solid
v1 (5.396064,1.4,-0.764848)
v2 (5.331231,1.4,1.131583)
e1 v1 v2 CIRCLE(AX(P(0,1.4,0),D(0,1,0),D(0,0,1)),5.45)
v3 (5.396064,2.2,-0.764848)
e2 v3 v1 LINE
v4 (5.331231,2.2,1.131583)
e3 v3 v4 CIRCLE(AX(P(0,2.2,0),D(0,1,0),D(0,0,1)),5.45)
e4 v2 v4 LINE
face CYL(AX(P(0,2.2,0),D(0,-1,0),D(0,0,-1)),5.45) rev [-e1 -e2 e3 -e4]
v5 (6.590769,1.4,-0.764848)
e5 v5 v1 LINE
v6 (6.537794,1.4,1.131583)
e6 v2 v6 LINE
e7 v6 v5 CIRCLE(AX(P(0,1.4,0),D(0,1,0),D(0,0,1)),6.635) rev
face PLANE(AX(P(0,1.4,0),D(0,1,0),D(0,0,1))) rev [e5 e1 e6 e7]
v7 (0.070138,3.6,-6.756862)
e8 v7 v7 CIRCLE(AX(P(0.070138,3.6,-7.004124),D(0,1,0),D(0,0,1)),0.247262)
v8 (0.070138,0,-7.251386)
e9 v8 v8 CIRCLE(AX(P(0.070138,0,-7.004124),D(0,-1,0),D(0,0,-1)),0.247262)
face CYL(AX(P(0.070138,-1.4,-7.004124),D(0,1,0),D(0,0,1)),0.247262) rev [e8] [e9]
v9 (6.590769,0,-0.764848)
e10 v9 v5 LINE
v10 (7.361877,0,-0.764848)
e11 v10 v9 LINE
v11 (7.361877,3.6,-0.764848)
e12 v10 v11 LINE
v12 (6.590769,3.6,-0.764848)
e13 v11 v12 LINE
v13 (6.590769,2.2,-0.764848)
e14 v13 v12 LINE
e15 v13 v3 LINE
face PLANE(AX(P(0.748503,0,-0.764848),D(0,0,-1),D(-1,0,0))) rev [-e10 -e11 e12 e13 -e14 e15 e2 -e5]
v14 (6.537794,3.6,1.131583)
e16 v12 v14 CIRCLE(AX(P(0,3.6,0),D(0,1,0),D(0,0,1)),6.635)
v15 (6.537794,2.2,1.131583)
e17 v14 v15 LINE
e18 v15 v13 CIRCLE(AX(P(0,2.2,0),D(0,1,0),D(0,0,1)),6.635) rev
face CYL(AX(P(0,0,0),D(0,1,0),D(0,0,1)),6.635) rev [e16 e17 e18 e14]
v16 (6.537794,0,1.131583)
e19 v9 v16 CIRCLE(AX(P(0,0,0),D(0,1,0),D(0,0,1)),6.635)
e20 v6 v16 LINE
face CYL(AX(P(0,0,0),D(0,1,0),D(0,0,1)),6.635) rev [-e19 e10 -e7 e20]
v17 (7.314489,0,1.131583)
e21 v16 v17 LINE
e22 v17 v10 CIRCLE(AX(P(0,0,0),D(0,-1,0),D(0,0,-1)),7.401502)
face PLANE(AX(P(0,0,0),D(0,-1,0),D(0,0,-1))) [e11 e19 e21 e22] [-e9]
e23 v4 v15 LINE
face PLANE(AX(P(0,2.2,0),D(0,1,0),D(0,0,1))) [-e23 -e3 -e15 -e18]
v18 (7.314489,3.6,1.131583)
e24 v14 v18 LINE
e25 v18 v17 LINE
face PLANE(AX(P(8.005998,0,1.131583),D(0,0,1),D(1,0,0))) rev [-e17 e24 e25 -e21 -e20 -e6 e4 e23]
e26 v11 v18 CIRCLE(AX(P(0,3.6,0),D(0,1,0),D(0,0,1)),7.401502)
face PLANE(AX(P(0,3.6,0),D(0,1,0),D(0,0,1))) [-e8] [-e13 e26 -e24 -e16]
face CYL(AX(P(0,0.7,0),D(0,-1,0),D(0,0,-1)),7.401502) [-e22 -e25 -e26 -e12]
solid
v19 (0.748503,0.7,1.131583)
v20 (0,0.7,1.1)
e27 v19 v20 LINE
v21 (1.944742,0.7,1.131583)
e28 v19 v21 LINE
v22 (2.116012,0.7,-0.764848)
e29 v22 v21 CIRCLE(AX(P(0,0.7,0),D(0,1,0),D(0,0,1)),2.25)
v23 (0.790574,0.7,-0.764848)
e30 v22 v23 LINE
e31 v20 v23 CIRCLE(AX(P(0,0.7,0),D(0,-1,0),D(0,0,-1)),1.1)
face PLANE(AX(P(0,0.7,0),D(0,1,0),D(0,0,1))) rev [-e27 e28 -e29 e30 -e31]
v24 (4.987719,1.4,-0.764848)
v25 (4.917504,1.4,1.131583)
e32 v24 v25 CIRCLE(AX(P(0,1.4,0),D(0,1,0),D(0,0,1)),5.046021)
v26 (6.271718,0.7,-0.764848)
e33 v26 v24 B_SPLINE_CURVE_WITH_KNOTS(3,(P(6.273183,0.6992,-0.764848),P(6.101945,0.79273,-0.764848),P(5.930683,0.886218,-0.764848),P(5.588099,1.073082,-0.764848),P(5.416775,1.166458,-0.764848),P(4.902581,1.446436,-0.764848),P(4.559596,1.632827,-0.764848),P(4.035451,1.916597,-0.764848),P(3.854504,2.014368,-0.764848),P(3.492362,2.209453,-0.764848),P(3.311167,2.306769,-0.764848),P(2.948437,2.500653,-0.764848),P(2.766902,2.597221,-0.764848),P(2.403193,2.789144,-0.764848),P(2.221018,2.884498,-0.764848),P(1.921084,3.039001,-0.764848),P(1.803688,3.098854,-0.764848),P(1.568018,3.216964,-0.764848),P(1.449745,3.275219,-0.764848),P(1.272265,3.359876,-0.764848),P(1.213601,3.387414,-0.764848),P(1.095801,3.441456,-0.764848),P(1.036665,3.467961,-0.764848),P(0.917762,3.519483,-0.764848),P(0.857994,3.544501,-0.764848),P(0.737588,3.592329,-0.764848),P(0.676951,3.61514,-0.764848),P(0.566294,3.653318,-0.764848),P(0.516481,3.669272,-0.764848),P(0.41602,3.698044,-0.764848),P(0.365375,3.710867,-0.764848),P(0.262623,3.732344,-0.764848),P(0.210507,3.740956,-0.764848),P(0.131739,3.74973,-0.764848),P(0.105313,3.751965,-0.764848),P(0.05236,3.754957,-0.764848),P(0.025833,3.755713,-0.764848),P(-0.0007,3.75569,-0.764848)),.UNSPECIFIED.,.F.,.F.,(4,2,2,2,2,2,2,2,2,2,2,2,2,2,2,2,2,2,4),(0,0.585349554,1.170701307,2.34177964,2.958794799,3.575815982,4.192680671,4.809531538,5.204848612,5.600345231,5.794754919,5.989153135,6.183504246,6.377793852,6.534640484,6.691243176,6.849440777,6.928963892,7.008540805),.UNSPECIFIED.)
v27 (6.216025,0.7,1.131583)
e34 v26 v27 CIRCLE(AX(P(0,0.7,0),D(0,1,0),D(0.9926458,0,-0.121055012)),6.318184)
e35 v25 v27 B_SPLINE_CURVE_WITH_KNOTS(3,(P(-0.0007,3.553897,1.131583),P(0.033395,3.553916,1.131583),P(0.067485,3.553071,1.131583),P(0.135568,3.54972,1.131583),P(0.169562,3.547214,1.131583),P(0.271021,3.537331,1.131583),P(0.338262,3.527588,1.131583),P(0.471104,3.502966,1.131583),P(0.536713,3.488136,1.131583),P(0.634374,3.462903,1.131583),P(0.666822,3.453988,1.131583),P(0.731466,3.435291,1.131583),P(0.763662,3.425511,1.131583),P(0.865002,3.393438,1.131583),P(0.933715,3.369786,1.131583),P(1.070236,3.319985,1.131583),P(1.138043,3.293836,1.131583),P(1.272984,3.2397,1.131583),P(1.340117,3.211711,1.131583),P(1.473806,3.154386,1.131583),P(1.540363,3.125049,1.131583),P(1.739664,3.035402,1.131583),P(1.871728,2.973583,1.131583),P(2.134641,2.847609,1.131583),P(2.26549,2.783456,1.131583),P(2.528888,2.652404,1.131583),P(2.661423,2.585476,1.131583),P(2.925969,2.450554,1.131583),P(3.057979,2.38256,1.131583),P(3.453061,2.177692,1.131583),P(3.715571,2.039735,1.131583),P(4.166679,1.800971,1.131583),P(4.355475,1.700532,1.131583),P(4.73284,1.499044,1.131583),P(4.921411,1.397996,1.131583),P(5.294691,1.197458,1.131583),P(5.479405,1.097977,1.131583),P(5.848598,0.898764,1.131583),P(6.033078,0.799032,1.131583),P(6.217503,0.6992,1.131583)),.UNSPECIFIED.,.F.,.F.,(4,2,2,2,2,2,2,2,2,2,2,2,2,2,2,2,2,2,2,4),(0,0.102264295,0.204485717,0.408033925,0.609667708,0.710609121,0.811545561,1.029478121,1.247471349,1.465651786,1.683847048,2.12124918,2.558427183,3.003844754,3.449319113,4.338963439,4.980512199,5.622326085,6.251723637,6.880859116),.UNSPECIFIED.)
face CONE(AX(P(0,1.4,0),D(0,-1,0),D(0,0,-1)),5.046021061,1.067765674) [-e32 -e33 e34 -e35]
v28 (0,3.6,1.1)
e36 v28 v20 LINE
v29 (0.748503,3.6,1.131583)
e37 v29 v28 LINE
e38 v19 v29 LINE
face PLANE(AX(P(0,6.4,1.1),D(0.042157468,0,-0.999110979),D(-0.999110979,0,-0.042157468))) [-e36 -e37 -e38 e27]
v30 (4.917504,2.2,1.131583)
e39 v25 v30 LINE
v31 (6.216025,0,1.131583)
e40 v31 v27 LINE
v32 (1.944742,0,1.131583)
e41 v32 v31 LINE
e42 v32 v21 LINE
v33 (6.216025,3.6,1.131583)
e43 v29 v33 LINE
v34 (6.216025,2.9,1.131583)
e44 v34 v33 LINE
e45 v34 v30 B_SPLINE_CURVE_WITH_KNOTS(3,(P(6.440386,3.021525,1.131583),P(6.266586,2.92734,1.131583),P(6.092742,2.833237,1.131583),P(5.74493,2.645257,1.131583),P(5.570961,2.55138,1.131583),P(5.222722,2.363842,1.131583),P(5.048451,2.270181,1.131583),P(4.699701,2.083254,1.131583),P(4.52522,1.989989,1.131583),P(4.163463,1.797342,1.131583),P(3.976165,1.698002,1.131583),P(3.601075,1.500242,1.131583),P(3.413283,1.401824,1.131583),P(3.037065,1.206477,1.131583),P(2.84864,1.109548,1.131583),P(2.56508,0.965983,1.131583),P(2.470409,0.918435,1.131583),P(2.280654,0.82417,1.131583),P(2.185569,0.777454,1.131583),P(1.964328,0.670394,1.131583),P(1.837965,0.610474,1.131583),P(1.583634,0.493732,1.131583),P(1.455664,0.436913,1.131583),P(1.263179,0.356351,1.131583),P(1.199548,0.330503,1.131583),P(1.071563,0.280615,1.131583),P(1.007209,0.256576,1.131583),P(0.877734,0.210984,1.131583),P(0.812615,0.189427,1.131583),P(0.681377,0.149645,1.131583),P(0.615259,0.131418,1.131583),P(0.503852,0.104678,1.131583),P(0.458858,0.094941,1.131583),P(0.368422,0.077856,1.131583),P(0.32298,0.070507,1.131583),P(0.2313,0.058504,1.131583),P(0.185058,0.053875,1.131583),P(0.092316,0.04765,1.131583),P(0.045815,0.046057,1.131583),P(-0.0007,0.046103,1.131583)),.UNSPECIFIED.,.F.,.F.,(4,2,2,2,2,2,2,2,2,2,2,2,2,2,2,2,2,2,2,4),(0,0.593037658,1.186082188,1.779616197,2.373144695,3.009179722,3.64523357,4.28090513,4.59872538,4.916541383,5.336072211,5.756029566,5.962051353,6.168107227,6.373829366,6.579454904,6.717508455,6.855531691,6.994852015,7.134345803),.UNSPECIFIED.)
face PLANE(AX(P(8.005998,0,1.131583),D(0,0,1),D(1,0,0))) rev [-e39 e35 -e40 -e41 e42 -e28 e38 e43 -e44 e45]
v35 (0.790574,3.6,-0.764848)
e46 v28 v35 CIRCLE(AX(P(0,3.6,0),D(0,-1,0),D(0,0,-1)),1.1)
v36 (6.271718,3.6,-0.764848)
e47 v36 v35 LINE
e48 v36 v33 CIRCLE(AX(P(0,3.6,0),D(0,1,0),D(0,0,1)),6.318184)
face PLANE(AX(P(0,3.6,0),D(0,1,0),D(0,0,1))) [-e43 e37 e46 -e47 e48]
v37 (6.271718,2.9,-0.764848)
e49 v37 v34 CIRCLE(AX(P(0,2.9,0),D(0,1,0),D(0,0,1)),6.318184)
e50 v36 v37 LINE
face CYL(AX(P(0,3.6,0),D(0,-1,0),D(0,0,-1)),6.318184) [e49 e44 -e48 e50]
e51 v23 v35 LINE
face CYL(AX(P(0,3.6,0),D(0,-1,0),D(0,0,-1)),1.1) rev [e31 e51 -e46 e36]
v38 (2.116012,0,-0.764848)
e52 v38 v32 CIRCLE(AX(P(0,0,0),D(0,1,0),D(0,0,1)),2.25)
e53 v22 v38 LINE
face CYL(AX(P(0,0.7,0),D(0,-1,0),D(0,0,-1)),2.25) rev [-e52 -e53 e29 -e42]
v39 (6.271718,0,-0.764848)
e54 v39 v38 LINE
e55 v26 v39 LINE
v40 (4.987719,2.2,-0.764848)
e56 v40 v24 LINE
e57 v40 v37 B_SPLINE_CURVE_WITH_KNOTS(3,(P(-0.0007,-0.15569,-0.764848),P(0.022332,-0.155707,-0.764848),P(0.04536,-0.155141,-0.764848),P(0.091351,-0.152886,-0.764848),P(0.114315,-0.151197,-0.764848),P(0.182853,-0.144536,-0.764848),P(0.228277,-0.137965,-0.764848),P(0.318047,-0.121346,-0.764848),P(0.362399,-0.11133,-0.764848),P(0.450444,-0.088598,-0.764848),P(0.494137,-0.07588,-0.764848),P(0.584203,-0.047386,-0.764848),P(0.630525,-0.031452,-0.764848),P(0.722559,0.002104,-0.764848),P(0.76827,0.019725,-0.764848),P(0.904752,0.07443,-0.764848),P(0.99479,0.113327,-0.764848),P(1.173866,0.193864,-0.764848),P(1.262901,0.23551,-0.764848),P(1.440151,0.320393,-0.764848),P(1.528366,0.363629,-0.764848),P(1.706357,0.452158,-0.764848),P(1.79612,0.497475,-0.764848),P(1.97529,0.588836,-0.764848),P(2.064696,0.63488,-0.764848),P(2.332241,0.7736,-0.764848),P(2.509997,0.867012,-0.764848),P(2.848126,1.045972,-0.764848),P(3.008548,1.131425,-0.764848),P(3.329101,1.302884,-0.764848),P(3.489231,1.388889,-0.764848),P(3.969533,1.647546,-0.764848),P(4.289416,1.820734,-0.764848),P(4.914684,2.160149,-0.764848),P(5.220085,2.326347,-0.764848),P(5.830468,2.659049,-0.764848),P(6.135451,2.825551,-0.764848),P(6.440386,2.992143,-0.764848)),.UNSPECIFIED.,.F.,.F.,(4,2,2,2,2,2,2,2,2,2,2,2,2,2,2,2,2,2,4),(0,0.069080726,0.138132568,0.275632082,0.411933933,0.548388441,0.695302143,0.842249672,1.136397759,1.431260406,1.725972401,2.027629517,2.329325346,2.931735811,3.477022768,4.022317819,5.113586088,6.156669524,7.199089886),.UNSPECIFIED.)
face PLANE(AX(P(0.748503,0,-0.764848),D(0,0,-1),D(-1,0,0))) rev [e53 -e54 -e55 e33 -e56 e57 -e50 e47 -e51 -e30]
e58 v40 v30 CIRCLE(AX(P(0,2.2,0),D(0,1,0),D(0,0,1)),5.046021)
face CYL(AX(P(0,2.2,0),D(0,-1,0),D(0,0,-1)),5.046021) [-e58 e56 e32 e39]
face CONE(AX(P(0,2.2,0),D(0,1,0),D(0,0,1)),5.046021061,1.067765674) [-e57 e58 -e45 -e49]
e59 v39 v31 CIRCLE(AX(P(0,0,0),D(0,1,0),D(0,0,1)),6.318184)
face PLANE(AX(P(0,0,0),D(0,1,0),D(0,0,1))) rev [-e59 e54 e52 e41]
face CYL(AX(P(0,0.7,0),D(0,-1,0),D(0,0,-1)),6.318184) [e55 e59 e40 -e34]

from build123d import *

# Parameters (mm, degrees)
SKETCH_1_R          = 6.318183566
SKETCH_1_R_2        = 2.25
EXTRUDE_1_DEPTH     = 0.7
SKETCH_3_R          = 5.046021061
EXTRUDE_2_DEPTH     = 0.8
SKETCH_4_R          = 6.318183566
SKETCH_5_R          = 6.318183566
EXTRUDE_3_DEPTH     = 0.7
SKETCH_6_R          = 1.1
CUT_EXTRUDE_1_DEPTH = 10.394088018
SKETCH_7_R          = 7.401501987
SKETCH_7_R_2        = 6.64605104
EXTRUDE_4_DEPTH     = 0.7
SKETCH_14_R         = 7.401501987
SKETCH_14_R_2       = 5.45
EXTRUDE_5_DEPTH     = 0.8
SKETCH_31_R         = 7.401501987
SKETCH_31_R_2       = 6.635
EXTRUDE_9_DEPTH     = 3.6
SKETCH_34_W         = 7.257495065
SKETCH_34_H         = 1.896430871
CUT_EXTRUDE_4_DEPTH = 12.069076896
CUT_EXTRUDE_5_DEPTH = 11.861605007
CUT_EXTRUDE_7_DEPTH = 5
SKETCH_38_R         = 0.247262234
CUT_EXTRUDE_9_DEPTH = 5


# Read off the part's stored shape, not the designer's step: 疊層拉伸1
with BuildPart() as part:
    # 草圖1 → 填料-伸長1 (new body)
    with BuildSketch(Plane(origin=(0, 0, 0), x_dir=(1, 0, 0), z_dir=(0, 1, 0))):
        with Locations(Location((0, 0, 0), (0, 0, 270))):
            Circle(SKETCH_1_R)
        with Locations(Location((0, 0, 0), (0, 0, 270))):
            Circle(SKETCH_1_R_2, mode=Mode.SUBTRACT)
    extrude(amount=EXTRUDE_1_DEPTH)

    # 疊層拉伸1 outline → 疊層拉伸1 (revolve)
    with BuildSketch(Plane.XY):
        Polygon((0, 1.4), (0, 0.7), (6.318183566, 0.7), (5.046021061, 1.4), align=None)
    revolve(axis=Axis((0, 0, 0), (0, 1, 0)))

    # 草圖3 → 填料-伸長2 (add)
    with BuildSketch(Plane(origin=(0, 1.4, 0), x_dir=(1, 0, 0), z_dir=(0, 1, 0))):
        with Locations(Location((0, 0, 0), (0, 0, 270))):
            Circle(SKETCH_3_R)
    extrude(amount=EXTRUDE_2_DEPTH)

    # 草圖4 → section 1 of loft_2
    with BuildSketch(Plane(origin=(0, 2.9, 0), x_dir=(1, 0, 0), z_dir=(0, 1, 0)), mode=Mode.PRIVATE) as loft_2_s1:
        Circle(SKETCH_4_R)
    # loft up to a face of the part (loft_2)
    loft([Face(Wire([part.edges().sort_by_distance((3.678391047, 2.2, -3.454239114))[0]])), loft_2_s1.sketch])

    # 草圖5 → 填料-伸長3 (add)
    with BuildSketch(Plane(origin=(0, 2.9, 0), x_dir=(1, 0, 0), z_dir=(0, 1, 0))):
        with Locations(Location((0, 0, 0), (0, 0, 270))):
            Circle(SKETCH_5_R)
    extrude(amount=EXTRUDE_3_DEPTH)

    # 草圖6 → 除料-伸長1 (cut, through all)
    with BuildSketch(Plane.XZ.offset(-0.7)):
        with Locations(Location((0, 0, 0), (0, 0, 270))):
            Circle(SKETCH_6_R)
    extrude(amount=-CUT_EXTRUDE_1_DEPTH, mode=Mode.SUBTRACT)


with BuildPart() as body_2:
    # 草圖7 → 填料-伸長4 (new body)
    with BuildSketch(Plane.XZ):
        with Locations(Location((0, 0, 0), (0, 0, 270))):
            Circle(SKETCH_7_R)
        with Locations(Location((0, 0, 0), (0, 0, 270))):
            Circle(SKETCH_7_R_2, mode=Mode.SUBTRACT)
    extrude(amount=-EXTRUDE_4_DEPTH)



with BuildPart() as body_3:
    # 草圖14 → 填料-伸長5 (new body)
    with BuildSketch(Plane(origin=(0, 1.4, 0), x_dir=(1, 0, 0), z_dir=(0, 1, 0))):
        with Locations(Location((0, 0, 0), (0, 0, 90))):
            Circle(SKETCH_14_R)
        with Locations(Location((0, 0, 0), (0, 0, 270))):
            Circle(SKETCH_14_R_2, mode=Mode.SUBTRACT)
    extrude(amount=EXTRUDE_5_DEPTH)


with BuildPart() as body_2_1:
    add(body_2.part)

    add(body_3.part)  # 填料-伸長9 merges body 3
    # 草圖31 → 填料-伸長9 (add)
    with BuildSketch(Plane(origin=(0, 3.6, 0), x_dir=(1, 0, 0), z_dir=(0, 1, 0))):
        with Locations(Location((0, 0, 0), (0, 0, 90))):
            Circle(SKETCH_31_R)
        with Locations(Location((0, 0, 0), (0, 0, 270))):
            Circle(SKETCH_31_R_2, mode=Mode.SUBTRACT)
    extrude(amount=-EXTRUDE_9_DEPTH)


with BuildPart() as cut_extrude_4_tool:
    # 草圖34 → 除料-伸長4 (new, through all)
    with BuildSketch(Plane(origin=(0, 3.6, 0), x_dir=(1, 0, 0), z_dir=(0, 1, 0))):
        with Locations((4.377250876, -0.183367649)):
            Rectangle(SKETCH_34_W, SKETCH_34_H)
    extrude(amount=-CUT_EXTRUDE_4_DEPTH)


with BuildPart() as part_1:
    add(part.part)

    # 除料-伸長4: cut by cut_extrude_4_tool
    add(cut_extrude_4_tool.part, mode=Mode.SUBTRACT)

    # 草圖35 → 除料-伸長5 (cut, through all)
    with BuildSketch(Plane.XZ.offset(-0.7)):
        Polygon((0.748503344, 1.131583084), (0.46388197, 0.910676659), (0.923529249, 0.707226224), align=None)
    extrude(amount=-CUT_EXTRUDE_5_DEPTH, mode=Mode.SUBTRACT)

    # 草圖36 → 除料-伸長7 (cut, symmetric)
    with BuildSketch(Plane(origin=(0, 1.4, 0), x_dir=(1, 0, 0), z_dir=(0, 1, 0))):
        Polygon((0, -1.1), (0.748503344, -1.131583084), (0.630994706, -0.920173616), align=None)
    extrude(amount=CUT_EXTRUDE_7_DEPTH, both=True, mode=Mode.SUBTRACT)


with BuildPart() as body_2_2:
    add(body_2_1.part)

    # 除料-伸長4: cut by cut_extrude_4_tool
    add(cut_extrude_4_tool.part, mode=Mode.SUBTRACT)

    # 草圖38 → 除料-伸長9 (cut, symmetric)
    with BuildSketch(Plane(origin=(0, 3.6, 0), x_dir=(1, 0, 0), z_dir=(0, 1, 0))):
        with Locations(Location((0.070137897, 7.004124097, 0), (0, 0, 270))):
            Circle(SKETCH_38_R)
    extrude(amount=CUT_EXTRUDE_9_DEPTH, both=True, mode=Mode.SUBTRACT)


solid = Compound([part_1.part, body_2_2.part])
